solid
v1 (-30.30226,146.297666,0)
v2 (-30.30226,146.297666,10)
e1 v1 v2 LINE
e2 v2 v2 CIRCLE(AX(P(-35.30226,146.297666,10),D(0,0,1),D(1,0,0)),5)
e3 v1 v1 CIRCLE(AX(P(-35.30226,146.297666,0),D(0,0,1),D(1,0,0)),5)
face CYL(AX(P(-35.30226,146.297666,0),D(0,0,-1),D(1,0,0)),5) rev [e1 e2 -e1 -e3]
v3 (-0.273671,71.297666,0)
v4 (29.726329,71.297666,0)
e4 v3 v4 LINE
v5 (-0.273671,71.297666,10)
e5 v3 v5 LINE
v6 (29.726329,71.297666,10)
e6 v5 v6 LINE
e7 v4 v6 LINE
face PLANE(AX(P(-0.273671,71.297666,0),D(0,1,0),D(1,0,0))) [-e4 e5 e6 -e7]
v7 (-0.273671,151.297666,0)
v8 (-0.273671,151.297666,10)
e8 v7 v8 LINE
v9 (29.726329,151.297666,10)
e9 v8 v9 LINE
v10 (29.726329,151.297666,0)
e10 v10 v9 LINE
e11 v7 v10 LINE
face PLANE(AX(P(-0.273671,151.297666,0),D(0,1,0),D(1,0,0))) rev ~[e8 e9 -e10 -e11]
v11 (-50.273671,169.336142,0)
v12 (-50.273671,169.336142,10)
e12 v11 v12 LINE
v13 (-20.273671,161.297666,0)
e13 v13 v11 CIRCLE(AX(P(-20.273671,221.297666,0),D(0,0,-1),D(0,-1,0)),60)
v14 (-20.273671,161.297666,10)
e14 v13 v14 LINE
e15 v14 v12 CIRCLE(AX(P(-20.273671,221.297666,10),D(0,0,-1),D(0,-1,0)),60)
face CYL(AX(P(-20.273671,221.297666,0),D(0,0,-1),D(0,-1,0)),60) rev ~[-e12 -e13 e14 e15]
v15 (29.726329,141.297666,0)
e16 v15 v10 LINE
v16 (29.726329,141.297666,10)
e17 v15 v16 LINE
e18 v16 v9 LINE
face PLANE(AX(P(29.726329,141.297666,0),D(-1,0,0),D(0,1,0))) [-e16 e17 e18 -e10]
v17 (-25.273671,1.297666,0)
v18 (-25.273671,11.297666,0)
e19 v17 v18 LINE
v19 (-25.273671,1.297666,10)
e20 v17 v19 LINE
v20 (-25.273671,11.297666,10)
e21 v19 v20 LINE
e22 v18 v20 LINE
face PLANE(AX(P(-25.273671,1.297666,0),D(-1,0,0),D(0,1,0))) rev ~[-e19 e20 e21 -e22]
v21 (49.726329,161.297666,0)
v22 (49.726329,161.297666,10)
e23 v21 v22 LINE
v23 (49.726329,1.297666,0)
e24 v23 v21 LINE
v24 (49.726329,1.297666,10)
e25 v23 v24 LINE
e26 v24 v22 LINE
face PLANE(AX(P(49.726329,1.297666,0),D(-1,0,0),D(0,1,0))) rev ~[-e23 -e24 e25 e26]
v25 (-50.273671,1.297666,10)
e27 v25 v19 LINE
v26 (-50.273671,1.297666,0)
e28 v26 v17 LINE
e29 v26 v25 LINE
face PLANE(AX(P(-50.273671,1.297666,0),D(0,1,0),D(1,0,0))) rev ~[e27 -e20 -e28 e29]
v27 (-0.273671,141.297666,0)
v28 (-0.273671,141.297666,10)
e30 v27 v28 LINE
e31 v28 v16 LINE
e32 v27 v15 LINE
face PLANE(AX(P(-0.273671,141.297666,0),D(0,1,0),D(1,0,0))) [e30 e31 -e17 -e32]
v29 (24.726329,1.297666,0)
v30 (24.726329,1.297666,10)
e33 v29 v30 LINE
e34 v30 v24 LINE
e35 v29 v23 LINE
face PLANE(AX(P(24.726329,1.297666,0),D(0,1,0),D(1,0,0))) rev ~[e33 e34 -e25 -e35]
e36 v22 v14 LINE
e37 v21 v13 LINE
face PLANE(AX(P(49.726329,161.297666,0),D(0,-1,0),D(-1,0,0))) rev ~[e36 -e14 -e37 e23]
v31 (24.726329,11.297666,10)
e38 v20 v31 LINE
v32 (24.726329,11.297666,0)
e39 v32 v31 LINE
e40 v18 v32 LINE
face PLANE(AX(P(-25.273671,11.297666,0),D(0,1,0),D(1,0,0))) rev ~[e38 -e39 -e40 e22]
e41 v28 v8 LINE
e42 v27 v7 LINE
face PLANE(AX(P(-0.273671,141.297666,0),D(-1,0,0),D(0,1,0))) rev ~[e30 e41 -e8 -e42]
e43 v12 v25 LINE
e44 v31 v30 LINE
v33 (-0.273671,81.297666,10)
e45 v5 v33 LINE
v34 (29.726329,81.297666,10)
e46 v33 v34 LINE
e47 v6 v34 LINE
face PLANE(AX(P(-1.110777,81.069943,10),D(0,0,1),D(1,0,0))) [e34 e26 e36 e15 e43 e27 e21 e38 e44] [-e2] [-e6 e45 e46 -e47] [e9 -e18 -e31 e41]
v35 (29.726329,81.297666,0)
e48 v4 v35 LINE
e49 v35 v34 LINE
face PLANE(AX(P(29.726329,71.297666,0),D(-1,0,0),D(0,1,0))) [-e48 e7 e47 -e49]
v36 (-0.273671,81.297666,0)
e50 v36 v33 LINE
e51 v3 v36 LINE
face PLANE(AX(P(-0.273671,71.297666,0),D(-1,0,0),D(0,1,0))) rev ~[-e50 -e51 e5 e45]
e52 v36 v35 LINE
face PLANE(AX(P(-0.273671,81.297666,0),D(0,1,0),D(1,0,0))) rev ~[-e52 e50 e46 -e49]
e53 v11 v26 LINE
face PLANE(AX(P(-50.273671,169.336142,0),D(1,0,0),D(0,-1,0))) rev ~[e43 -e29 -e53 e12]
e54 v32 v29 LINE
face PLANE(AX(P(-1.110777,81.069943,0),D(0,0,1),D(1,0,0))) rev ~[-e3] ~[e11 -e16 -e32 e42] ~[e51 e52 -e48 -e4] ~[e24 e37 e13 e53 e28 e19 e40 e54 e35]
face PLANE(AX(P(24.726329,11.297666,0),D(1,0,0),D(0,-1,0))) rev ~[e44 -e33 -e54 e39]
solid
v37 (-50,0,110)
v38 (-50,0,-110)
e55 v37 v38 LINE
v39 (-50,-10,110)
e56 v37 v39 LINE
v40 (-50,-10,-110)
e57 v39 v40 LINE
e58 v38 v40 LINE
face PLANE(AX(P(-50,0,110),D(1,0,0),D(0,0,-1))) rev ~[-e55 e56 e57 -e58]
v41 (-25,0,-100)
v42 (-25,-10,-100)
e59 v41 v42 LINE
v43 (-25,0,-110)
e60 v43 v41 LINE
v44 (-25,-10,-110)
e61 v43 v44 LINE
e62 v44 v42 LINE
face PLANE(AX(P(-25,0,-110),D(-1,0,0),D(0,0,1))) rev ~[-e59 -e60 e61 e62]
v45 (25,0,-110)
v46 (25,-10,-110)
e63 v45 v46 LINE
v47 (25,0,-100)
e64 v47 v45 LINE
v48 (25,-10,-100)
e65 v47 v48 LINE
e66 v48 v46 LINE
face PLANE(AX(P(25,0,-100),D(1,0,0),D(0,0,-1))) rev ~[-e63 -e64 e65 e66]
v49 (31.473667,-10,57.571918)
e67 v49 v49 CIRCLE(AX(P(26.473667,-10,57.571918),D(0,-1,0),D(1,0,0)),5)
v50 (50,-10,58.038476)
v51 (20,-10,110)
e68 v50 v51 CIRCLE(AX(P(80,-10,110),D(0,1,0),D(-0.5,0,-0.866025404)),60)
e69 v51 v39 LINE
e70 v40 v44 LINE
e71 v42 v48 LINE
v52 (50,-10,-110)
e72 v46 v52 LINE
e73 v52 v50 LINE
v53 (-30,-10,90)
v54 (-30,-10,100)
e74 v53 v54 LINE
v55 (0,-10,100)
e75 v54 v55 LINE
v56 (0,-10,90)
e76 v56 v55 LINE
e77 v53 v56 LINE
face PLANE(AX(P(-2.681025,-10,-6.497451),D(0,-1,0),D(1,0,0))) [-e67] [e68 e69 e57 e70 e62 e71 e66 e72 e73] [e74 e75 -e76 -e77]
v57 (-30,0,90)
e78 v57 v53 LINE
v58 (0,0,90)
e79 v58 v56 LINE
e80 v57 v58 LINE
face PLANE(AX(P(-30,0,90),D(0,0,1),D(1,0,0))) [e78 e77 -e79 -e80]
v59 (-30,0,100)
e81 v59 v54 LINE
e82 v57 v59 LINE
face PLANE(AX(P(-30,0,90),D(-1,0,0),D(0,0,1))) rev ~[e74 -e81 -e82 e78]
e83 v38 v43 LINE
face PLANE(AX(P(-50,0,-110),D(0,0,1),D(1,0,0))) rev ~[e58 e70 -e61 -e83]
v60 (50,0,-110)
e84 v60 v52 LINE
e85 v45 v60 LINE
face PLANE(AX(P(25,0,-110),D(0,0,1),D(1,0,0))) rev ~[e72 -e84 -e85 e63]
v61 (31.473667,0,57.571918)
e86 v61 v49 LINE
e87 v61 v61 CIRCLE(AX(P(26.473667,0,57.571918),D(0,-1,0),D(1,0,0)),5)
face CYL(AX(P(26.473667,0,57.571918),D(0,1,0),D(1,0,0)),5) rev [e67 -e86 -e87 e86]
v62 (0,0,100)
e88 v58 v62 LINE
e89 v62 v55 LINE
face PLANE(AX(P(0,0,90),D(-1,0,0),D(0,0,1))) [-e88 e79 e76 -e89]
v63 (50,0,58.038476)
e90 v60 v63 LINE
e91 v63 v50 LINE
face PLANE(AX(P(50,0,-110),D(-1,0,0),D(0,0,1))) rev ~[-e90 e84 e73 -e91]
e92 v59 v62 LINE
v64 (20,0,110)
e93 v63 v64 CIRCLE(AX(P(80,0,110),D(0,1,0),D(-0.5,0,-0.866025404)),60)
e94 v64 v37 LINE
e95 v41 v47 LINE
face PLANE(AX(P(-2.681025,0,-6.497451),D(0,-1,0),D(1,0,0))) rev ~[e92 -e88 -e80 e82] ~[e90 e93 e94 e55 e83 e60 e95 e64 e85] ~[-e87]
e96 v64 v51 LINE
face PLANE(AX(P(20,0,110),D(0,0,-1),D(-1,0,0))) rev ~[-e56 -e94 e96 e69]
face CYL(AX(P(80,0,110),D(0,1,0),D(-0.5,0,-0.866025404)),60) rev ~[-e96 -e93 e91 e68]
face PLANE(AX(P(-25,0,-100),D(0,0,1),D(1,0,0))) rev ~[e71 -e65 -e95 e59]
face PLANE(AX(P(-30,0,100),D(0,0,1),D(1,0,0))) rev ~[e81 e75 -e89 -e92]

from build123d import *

# Parameters (mm, degrees)
F0_W     = 30
F0_H     = 10
F0_R     = 5
F1_DEPTH = 10
F2_W     = 30
F2_H     = 10
F2_R     = 5
F3_DEPTH = 10


# Not quite as in the source:
# - a feature names something its author has since deleted; it is built from what else it names


with BuildPart() as f1:
    # F0 (on Front) → F1 (new body)
    with BuildSketch(Plane.XZ):
        with BuildLine():
            ThreePointArc((50, 58.0384757729), (28.0384757729, 80), (20, 110))
            Line((20, 110), (-50, 110))
            Line((-50, 110), (-50, -110))
            Line((-50, -110), (-25, -110))
            Line((-25, -110), (-25, -100))
            Line((-25, -100), (25, -100))
            Line((25, -100), (25, -110))
            Line((25, -110), (50, -110))
            Line((50, -110), (50, 58.0384757729))
        make_face()
        with Locations((-15, 95)):
            Rectangle(F0_W, F0_H, mode=Mode.SUBTRACT)
        with Locations((26.4736674726, 57.5719177723)):
            Circle(F0_R, mode=Mode.SUBTRACT)
    extrude(amount=F1_DEPTH)


with BuildPart() as f3:
    # F2 (on Top) → F3 (new body)
    with BuildSketch(Plane.XY):
        with BuildLine():
            ThreePointArc((-20.2736711096, 161.2976664366), (-35.8028138157, 163.3421168592), (-50.2736711096, 169.3361422095))
            Line((-50.2736711096, 169.3361422095), (-50.2736711096, 1.2976664366))
            Line((-50.2736711096, 1.2976664366), (-25.2736711096, 1.2976664366))
            Line((-25.2736711096, 1.2976664366), (-25.2736711096, 11.2976664366))
            Line((-25.2736711096, 11.2976664366), (24.7263288904, 11.2976664366))
            Line((24.7263288904, 11.2976664366), (24.7263288904, 1.2976664366))
            Line((24.7263288904, 1.2976664366), (49.7263288904, 1.2976664366))
            Line((49.7263288904, 1.2976664366), (49.7263288904, 161.2976664366))
            Line((49.7263288904, 161.2976664366), (-20.2736711096, 161.2976664366))
        make_face()
        with Locations((14.7263288904, 76.2976664366)):
            Rectangle(F2_W, F2_H, mode=Mode.SUBTRACT)
        with Locations((-35.3022602503, 146.2976664366)):
            Circle(F2_R, mode=Mode.SUBTRACT)
        with Locations((14.7263288904, 146.2976664366)):
            Rectangle(F2_W, F2_H, mode=Mode.SUBTRACT)
    extrude(amount=F3_DEPTH)


solid = Compound([f1.part, f3.part])
